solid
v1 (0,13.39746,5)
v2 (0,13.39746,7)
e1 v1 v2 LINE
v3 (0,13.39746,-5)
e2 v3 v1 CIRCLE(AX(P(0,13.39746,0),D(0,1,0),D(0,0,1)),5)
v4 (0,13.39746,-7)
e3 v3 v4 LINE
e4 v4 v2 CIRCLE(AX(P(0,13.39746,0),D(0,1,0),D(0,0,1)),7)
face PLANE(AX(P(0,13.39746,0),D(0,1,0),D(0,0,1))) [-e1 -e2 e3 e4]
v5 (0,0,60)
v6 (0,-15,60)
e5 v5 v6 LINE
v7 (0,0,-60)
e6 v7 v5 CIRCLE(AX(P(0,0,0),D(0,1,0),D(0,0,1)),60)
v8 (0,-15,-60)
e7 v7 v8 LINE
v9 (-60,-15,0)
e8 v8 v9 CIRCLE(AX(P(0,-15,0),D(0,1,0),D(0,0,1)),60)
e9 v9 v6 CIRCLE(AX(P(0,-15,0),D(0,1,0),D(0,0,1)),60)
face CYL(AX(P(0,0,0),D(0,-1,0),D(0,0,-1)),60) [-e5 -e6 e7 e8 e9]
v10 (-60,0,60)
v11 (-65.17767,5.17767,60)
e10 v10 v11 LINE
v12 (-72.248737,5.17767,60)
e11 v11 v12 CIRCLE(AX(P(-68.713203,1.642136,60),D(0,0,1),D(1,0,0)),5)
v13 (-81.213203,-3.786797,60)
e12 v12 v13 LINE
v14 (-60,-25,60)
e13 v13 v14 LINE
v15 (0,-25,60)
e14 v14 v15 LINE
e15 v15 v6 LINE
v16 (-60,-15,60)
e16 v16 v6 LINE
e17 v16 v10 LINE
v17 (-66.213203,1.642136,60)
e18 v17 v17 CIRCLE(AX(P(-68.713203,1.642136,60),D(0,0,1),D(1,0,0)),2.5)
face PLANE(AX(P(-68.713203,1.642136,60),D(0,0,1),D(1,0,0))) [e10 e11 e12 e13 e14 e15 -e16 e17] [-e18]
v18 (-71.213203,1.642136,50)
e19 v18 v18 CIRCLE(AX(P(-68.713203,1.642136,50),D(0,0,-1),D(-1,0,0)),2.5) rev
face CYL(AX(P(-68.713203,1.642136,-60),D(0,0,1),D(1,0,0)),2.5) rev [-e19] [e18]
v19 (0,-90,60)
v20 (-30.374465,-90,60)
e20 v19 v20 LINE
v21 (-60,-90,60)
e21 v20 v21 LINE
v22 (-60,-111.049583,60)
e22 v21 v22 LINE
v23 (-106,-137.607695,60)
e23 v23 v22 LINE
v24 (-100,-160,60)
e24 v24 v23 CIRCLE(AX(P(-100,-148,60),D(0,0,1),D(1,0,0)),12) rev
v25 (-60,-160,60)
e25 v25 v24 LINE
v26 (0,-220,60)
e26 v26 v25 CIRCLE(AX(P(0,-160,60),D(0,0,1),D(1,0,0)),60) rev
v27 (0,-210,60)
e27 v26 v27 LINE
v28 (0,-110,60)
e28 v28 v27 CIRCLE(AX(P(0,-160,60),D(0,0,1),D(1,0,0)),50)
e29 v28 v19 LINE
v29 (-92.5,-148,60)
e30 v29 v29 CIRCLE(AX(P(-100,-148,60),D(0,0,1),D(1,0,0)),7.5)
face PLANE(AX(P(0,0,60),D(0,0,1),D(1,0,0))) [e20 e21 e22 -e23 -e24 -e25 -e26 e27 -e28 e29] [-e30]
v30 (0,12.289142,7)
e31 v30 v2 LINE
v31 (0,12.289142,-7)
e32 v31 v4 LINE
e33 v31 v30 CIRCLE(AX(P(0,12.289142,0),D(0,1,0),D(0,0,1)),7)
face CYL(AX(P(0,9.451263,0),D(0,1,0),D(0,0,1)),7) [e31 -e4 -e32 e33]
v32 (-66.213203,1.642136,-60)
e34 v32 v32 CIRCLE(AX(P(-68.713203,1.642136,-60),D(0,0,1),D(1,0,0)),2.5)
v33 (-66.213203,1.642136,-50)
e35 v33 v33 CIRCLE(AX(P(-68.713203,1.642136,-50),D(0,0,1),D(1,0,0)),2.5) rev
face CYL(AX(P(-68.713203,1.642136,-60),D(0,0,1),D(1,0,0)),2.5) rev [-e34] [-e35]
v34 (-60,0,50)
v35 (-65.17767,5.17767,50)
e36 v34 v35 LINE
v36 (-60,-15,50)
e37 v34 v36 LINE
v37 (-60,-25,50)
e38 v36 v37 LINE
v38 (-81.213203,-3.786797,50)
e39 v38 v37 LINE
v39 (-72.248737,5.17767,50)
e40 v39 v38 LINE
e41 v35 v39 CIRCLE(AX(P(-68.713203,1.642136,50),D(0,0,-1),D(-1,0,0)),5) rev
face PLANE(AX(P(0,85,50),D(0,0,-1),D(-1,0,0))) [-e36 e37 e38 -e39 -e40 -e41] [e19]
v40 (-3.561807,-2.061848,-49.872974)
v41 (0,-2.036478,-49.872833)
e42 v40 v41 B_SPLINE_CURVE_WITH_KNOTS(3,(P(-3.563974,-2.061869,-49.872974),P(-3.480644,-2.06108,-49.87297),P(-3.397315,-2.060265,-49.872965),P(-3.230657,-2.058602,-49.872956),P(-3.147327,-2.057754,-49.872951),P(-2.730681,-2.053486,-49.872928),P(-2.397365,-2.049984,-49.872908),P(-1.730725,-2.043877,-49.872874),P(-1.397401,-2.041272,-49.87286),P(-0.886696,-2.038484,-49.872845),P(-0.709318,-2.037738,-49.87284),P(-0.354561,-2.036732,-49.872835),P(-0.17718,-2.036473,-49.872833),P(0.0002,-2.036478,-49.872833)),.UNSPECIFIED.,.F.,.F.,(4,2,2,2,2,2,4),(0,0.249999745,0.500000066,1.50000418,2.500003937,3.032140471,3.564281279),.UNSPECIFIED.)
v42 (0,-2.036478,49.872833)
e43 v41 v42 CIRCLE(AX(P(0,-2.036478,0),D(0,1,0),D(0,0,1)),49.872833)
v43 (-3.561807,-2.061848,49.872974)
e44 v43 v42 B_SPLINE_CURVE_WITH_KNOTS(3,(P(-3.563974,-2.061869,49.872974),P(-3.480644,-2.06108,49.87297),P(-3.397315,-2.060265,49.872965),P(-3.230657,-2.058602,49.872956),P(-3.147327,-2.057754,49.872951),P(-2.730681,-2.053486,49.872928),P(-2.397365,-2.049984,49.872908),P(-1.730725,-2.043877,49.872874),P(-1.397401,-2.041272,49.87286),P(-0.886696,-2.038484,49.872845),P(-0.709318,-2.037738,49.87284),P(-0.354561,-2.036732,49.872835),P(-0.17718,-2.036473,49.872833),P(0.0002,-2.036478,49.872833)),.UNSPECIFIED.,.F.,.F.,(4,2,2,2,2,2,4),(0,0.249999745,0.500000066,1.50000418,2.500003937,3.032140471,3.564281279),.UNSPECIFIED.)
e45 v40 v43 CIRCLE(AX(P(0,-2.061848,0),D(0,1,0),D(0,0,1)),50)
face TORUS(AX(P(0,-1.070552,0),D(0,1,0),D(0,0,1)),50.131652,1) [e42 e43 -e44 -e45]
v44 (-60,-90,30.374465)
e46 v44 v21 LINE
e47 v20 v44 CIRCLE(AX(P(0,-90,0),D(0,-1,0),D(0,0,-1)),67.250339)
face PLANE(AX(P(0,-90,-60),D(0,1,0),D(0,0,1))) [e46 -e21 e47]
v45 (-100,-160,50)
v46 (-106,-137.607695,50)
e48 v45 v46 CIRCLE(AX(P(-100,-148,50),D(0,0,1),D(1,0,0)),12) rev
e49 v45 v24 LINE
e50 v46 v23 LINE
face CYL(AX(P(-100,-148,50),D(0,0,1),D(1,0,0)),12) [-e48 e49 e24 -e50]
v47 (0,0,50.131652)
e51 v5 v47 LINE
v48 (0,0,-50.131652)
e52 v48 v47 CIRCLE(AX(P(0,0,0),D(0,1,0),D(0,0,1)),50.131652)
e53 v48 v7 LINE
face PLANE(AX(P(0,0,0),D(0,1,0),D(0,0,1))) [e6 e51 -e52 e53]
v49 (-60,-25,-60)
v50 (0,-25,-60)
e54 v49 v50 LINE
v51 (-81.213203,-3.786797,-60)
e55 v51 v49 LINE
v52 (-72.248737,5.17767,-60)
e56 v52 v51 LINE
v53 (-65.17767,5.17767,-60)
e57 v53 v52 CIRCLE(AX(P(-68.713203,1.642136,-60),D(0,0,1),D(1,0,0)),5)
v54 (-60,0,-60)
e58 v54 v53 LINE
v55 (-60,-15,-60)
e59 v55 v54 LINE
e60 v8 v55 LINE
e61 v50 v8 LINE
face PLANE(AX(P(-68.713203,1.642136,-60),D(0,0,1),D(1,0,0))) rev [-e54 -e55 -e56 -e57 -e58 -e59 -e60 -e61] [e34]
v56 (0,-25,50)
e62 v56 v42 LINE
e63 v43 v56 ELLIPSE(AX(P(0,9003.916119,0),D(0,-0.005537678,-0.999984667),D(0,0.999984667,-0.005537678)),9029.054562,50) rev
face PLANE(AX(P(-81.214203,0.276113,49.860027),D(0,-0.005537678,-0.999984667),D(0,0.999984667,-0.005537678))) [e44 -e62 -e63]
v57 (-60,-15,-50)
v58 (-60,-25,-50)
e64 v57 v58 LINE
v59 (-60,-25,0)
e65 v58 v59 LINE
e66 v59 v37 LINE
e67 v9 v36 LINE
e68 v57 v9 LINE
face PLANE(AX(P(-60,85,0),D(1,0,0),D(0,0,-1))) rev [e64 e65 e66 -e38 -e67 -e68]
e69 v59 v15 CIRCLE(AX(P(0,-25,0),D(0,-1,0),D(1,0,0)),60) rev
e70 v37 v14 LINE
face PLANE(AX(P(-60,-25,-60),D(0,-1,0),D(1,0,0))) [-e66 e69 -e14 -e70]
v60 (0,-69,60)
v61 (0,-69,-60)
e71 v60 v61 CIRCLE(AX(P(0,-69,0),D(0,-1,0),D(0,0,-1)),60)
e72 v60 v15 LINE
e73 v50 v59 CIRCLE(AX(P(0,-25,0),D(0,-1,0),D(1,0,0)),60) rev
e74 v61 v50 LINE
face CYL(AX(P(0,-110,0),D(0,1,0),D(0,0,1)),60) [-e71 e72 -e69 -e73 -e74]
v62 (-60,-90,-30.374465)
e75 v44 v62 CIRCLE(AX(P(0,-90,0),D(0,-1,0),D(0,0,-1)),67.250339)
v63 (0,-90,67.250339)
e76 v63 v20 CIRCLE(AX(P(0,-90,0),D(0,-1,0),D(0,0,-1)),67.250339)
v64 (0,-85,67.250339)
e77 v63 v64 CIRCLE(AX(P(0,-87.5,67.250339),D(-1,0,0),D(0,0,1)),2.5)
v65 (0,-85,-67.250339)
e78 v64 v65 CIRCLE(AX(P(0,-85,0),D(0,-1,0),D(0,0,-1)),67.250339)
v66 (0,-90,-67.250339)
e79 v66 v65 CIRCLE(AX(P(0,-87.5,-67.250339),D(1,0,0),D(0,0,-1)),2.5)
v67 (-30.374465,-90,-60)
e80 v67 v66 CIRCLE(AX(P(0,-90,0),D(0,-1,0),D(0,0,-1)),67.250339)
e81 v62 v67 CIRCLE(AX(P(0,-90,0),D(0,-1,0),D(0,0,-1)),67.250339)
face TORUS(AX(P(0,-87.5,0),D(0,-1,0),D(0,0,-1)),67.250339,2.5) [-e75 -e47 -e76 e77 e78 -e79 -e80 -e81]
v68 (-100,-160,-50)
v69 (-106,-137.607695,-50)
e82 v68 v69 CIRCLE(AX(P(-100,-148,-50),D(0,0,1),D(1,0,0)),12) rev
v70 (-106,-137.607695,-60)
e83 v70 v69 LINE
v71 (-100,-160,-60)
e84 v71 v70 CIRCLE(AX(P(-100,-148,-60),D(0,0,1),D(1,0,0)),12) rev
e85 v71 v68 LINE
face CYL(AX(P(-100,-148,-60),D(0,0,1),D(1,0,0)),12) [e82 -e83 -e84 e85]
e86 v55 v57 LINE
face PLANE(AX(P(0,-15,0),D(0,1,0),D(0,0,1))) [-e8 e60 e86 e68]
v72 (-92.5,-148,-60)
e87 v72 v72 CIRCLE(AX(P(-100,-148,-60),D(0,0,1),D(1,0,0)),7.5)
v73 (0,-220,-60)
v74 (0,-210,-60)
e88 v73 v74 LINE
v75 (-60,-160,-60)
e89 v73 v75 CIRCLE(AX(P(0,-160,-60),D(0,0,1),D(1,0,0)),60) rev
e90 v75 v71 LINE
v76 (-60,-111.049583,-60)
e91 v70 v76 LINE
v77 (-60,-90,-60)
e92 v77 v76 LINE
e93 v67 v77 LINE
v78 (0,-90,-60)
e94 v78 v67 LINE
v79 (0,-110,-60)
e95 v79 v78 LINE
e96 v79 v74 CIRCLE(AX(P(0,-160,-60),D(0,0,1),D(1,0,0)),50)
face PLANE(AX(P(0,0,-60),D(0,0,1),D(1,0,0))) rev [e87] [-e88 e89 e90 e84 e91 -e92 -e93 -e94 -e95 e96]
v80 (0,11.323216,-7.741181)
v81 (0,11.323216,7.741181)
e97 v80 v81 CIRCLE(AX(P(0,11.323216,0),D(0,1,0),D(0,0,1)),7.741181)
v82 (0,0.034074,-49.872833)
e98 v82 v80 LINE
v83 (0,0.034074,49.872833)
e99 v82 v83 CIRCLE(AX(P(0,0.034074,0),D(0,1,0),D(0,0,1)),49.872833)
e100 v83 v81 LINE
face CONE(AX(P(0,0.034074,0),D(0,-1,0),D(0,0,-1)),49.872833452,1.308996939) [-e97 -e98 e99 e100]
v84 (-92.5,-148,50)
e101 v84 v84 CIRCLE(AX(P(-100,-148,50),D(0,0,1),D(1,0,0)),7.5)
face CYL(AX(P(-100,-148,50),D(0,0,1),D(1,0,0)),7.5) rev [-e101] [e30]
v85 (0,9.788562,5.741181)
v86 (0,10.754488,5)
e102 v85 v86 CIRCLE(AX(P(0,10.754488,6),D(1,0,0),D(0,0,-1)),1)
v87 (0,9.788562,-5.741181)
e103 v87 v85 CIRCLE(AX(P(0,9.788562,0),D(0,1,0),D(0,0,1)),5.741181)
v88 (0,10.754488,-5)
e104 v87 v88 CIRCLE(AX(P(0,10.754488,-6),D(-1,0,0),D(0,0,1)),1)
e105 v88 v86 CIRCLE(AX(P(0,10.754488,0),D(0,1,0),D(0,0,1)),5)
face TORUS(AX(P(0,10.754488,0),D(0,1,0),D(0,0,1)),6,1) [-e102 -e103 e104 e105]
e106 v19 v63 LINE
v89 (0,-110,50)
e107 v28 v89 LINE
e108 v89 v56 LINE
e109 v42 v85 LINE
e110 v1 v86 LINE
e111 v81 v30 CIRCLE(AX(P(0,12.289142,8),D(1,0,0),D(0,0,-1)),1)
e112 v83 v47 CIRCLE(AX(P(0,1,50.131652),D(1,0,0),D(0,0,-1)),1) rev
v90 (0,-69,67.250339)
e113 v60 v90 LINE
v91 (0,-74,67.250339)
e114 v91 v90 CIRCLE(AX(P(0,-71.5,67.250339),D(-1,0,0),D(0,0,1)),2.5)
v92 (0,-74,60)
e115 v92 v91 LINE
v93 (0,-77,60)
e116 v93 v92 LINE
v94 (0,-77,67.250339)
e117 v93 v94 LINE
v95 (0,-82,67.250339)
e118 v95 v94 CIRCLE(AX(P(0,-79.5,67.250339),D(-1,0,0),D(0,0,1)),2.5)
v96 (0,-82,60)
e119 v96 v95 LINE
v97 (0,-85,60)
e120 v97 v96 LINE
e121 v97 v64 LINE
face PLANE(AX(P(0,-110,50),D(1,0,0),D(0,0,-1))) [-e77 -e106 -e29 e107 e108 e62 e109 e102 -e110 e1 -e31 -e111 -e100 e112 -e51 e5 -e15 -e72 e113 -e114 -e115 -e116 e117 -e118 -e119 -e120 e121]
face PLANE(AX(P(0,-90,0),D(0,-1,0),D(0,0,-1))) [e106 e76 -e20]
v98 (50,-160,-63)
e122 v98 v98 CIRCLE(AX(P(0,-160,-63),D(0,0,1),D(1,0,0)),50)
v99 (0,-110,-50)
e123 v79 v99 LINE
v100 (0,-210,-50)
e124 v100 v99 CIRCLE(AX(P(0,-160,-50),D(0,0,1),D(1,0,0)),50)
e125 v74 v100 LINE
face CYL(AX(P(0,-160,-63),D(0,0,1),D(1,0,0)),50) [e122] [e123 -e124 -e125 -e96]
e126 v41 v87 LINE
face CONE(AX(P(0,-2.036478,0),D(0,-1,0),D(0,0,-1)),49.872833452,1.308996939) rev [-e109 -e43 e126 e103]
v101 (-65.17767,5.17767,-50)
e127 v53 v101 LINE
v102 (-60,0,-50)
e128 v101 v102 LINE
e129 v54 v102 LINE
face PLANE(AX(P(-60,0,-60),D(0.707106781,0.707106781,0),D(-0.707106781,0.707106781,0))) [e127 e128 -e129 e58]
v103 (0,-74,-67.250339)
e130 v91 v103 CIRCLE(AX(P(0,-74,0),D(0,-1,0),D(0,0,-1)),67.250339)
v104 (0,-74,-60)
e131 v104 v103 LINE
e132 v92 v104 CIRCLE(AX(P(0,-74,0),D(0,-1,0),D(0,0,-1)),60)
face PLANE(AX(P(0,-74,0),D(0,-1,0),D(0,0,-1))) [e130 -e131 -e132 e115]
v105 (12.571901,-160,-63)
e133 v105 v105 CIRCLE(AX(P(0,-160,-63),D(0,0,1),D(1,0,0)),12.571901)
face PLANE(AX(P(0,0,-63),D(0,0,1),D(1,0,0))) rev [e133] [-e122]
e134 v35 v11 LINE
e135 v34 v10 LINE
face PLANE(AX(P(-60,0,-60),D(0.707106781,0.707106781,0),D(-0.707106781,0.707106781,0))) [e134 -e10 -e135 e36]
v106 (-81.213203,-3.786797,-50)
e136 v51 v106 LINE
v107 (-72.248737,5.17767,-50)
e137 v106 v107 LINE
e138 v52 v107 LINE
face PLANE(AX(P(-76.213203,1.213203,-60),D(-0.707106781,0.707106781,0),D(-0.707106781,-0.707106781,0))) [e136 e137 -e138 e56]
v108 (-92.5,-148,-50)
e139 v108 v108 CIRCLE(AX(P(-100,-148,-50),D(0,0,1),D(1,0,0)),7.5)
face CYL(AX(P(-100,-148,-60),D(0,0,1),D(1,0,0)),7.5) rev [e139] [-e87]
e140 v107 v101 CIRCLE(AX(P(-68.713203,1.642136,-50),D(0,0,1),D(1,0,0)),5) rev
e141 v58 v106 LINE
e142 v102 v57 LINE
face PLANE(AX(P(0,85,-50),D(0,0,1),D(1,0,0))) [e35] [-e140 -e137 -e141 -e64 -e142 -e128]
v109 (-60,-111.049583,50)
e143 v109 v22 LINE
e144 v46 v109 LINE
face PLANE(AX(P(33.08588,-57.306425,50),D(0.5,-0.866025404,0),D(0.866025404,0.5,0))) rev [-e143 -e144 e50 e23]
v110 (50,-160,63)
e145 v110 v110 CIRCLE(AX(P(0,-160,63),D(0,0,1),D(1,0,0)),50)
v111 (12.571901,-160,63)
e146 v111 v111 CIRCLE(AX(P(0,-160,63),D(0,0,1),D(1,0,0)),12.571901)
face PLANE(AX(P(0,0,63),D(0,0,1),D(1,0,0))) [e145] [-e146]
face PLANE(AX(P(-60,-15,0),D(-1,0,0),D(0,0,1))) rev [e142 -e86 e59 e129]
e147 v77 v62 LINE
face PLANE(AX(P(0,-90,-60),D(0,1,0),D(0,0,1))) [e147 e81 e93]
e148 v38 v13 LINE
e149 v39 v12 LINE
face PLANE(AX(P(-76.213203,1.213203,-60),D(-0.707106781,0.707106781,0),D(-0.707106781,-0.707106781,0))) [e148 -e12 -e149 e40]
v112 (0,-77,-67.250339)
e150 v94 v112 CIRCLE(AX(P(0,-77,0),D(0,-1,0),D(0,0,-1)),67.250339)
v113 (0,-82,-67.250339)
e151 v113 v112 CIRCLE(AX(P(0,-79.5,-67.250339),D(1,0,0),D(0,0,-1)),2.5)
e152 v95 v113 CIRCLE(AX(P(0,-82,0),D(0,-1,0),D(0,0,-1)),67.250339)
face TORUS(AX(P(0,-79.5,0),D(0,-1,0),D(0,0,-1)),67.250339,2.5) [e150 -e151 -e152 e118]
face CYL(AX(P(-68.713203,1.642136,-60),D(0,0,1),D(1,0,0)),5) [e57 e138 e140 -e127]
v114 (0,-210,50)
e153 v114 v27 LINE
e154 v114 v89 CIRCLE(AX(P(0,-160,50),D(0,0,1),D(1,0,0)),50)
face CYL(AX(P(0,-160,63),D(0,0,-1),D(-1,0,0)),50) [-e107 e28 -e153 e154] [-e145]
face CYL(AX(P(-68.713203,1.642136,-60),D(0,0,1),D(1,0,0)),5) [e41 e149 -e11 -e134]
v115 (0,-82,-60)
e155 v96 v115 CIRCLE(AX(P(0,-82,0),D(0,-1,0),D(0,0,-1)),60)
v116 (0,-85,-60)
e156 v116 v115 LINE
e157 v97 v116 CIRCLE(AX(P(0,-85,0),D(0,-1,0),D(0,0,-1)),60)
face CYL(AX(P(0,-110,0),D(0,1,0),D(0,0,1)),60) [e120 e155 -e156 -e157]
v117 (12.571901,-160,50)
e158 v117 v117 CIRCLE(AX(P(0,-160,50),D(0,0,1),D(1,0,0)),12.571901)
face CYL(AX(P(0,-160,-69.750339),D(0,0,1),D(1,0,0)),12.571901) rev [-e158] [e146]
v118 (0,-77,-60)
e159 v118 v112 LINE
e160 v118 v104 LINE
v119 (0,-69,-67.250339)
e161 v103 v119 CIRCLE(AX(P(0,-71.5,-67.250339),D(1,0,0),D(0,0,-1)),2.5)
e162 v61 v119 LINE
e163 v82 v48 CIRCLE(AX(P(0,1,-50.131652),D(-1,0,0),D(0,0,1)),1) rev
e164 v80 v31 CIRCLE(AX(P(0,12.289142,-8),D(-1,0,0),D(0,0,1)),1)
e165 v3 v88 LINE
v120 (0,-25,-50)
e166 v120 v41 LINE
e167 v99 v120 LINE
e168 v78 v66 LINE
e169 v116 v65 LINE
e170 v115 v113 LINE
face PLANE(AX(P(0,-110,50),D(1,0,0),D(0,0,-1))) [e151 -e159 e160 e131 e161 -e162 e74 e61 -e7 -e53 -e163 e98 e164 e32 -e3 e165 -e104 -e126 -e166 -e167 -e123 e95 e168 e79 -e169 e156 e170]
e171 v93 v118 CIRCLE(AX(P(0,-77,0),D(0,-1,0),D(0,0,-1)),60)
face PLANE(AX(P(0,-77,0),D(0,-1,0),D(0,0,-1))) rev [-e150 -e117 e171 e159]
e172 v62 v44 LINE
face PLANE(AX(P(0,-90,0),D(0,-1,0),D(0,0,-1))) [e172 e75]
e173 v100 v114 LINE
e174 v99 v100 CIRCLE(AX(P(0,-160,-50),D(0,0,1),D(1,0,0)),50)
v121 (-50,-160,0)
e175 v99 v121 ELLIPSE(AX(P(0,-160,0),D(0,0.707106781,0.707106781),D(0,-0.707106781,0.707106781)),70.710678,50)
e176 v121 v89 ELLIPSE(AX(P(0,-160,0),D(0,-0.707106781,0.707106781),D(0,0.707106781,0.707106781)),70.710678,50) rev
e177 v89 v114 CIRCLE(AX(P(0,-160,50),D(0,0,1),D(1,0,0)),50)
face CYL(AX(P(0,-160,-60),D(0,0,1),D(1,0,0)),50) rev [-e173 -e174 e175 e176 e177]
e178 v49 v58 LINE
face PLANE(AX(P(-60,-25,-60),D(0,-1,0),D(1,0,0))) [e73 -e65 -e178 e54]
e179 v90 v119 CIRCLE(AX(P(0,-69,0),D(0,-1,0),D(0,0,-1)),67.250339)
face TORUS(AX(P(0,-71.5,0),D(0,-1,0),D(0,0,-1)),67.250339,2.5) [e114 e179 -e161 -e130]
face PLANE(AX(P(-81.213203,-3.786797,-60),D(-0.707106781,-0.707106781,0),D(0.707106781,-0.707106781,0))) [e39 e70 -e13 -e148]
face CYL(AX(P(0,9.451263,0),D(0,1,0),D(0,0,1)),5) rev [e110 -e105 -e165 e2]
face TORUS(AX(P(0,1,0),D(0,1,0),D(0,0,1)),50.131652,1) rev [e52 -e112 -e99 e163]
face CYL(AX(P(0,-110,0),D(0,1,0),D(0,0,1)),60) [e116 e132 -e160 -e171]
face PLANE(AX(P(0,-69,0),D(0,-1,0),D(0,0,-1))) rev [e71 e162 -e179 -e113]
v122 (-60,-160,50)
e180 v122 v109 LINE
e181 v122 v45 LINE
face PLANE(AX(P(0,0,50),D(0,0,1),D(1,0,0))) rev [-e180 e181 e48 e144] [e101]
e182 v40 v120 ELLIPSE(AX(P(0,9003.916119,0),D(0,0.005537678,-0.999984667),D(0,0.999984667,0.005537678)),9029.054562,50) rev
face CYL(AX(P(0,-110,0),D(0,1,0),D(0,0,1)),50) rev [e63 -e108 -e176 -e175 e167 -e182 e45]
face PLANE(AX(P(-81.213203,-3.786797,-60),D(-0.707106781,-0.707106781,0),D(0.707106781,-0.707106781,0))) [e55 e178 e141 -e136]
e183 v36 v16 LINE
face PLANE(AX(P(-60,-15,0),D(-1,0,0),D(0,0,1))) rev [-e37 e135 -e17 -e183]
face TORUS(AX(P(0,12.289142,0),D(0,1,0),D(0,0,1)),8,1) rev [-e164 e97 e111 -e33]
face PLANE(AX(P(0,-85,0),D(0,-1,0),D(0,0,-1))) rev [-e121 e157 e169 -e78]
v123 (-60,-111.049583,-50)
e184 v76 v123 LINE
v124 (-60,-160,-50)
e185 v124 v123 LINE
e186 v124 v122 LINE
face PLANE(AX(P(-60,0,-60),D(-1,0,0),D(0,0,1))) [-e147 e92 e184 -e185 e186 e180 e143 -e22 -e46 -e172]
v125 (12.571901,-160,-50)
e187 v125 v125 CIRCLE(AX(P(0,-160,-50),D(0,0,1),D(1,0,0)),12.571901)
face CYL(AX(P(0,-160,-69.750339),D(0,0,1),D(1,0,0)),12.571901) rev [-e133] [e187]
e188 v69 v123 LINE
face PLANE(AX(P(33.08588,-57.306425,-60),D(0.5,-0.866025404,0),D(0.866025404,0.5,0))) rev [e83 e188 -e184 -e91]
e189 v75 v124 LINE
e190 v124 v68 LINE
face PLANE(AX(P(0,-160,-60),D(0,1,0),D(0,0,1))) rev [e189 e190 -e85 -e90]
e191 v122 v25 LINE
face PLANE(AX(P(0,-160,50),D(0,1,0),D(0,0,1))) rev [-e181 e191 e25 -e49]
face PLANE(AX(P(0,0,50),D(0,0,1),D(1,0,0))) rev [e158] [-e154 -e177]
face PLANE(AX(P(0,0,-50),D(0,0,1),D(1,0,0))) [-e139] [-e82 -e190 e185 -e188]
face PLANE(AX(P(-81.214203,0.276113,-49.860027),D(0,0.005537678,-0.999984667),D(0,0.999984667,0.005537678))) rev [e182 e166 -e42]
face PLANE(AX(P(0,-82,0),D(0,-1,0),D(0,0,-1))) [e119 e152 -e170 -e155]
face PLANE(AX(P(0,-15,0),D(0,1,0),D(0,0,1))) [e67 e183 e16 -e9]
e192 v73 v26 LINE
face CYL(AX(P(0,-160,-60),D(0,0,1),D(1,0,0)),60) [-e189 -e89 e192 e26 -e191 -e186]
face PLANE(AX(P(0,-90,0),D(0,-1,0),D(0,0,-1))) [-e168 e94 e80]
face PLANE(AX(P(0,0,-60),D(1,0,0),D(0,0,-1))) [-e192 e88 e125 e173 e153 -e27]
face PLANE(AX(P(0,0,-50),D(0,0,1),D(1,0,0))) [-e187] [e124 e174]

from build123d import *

# Parameters (mm, degrees)
BOSS_EXTRUDE1_DEPTH      = 110
REVOLVE4_ANGLE           = 180
SKETCH5_R                = 2.5
BOSS_EXTRUDE2_DEPTH      = 120
CUT_EXTRUDE2_REACH       = 151.317
CUT_EXTRUDE2_END_RADIUS  = 50
REVOLVE5_ANGLE           = 180
CUT_EXTRUDE4_DEPTH       = 15
CUT_EXTRUDE5_DEPTH       = 85
CUT_EXTRUDE5_DEPTH_BACK  = 75
SKETCH7_5_W              = 21.213203436
SKETCH7_5_H              = 100
REVOLVE6_ANGLE           = 180
BOSS_EXTRUDE3_DEPTH      = 3
BOSS_EXTRUDE3_DEPTH_BACK = 10
SKETCH9_R                = 50
BOSS_EXTRUDE4_START      = -110
SKETCH9_3_R              = 50
BOSS_EXTRUDE4_DEPTH      = 13
BOSS_EXTRUDE5_DEPTH      = 120
CUT_EXTRUDE6_START       = -110
CUT_EXTRUDE6_DEPTH       = 20
CUT_EXTRUDE7_DEPTH       = 50
SKETCH9_5_R              = 7.5
BOSS_EXTRUDE6_DEPTH      = 10
BOSS_EXTRUDE7_START      = -110
SKETCH9_6_R              = 7.5
BOSS_EXTRUDE7_DEPTH      = 10
SKETCH12_R               = 12.571901436
CUT_EXTRUDE8_DEPTH       = 281.297435946
BOSS_EXTRUDE9_START      = 15
BOSS_EXTRUDE9_DEPTH      = 15


# Read off the part's stored shape, not the designer's step: Cut-Extrude6
with BuildPart() as part:
    # Sketch1 → Boss-Extrude1 (new body)
    with BuildSketch(Plane(origin=(0, 0, 0), x_dir=(1, 0, 0), z_dir=(0, 1, 0))):
        with BuildLine():
            Line((0, 60), (0, 50))
            ThreePointArc((0, 50), (-50, 0), (0, -50))
            Line((0, -50), (0, -60))
            ThreePointArc((0, -60), (-60, 0), (0, 60))
        make_face()
    extrude(amount=-BOSS_EXTRUDE1_DEPTH)

    # Sketch2 → Revolve4 (revolve)
    with BuildSketch(Plane(origin=(0, 0, 0), x_dir=(0, 0, -1), z_dir=(1, 0, 0))):
        with BuildLine():
            ThreePointArc((-7.741180955, 11.323216436), (-7.20664666, 11.680380834), (-7, 12.289142263))
            Line((-7, 12.289142263), (-7, 13.397459622))
            Line((-7, 13.397459622), (-5, 13.397459622))
            Line((-5, 13.397459622), (-5, 12.057713659))
            Line((-5, 12.057713659), (-5, 10.754488287))
            ThreePointArc((-5, 10.754488287), (-5.20664666, 10.145726858), (-5.741180955, 9.78856246))
            Line((-5.741180955, 9.78856246), (-49.872833452, -2.036478187))
            ThreePointArc((-49.872833452, -2.036478187), (-50.001126305, -2.061997222), (-50.131652498, -2.070552361))
            Line((-50.131652498, -2.070552361), (-60, -2.070552361))
            Line((-60, -2.070552361), (-60, 0))
            Line((-60, 0), (-50.131652498, 0))
            ThreePointArc((-50.131652498, 0), (-50.001126305, 0.008555139), (-49.872833452, 0.034074174))
            Line((-49.872833452, 0.034074174), (-7.741180955, 11.323216436))
        make_face()
    revolve(axis=Axis((0, 9.451262914, 0), (0, -1, 0)), revolution_arc=REVOLVE4_ANGLE)

    # Sketch5 → Boss-Extrude2 (add)
    with BuildSketch(Plane.XY.offset(60)):
        with BuildLine():
            Line((-60, -25), (0, -25))
            Line((0, -25), (0, -15))
            Line((0, -15), (0, 0))
            Line((0, 0), (-60, 0))
            Line((-60, 0), (-65.17766953, 5.17766953))
            ThreePointArc((-65.17766953, 5.17766953), (-68.713203436, 6.642135624), (-72.248737342, 5.17766953))
            Line((-72.248737342, 5.17766953), (-76.213203436, 1.213203436))
            Line((-76.213203436, 1.213203436), (-81.213203436, -3.786796564))
            Line((-81.213203436, -3.786796564), (-60, -25))
        make_face()
        with Locations((-68.713203436, 1.642135624)):
            Circle(SKETCH5_R, mode=Mode.SUBTRACT)
    extrude(amount=-BOSS_EXTRUDE2_DEPTH)

    # Cut-Extrude2: up to this cylinder (the profile starts inside it)
    cut_extrude2_end = Plane(origin=(0, -12.579447, 0), z_dir=(0, 1, 0)) * Cylinder(CUT_EXTRUDE2_END_RADIUS, 403.634, mode=Mode.PRIVATE)
    # Sketch6 → Cut-Extrude2 (cut, up to the surface)
    with BuildSketch(Plane(origin=(0, 0, 0), x_dir=(0, 0, -1), z_dir=(1, 0, 0)), mode=Mode.PRIVATE) as cut_extrude2_sk1:
        Polygon((-49.872833452, -2.036478187), (-50, -25), (50, -25), (49.872833452, -2.036478187), (42.27259339, 0), (-42.27259339, 0), align=None)
    cut_extrude2_tool1 = extrude(cut_extrude2_sk1.sketch, amount=-CUT_EXTRUDE2_REACH, mode=Mode.PRIVATE) & cut_extrude2_end
    add(cut_extrude2_tool1.solids().sort_by_distance((0, -12.579447, 0))[0], mode=Mode.SUBTRACT)

    # Sketch2<8> → Revolve5 (revolve)
    with BuildSketch(Plane(origin=(0, 0, 0), x_dir=(0, 0, -1), z_dir=(1, 0, 0))):
        with BuildLine():
            Line((-49.872833452, 0.034074174), (-7.741180955, 11.323216436))
            ThreePointArc((-7.741180955, 11.323216436), (-7.20664666, 11.680380834), (-7, 12.289142263))
            Line((-7, 12.289142263), (-7, 13.397459622))
            Line((-7, 13.397459622), (-5, 13.397459622))
            Line((-5, 13.397459622), (-5, 12.057713659))
            Line((-5, 12.057713659), (-5, 10.754488287))
            ThreePointArc((-5, 10.754488287), (-5.20664666, 10.145726858), (-5.741180955, 9.78856246))
            Line((-5.741180955, 9.78856246), (-49.872833452, -2.036478187))
            ThreePointArc((-49.872833452, -2.036478187), (-50.001126305, -2.061997222), (-50.131652498, -2.070552361))
            Line((-50.131652498, -2.070552361), (-60, -2.070552361))
            Line((-60, -2.070552361), (-60, 0))
            Line((-60, 0), (-50.131652498, 0))
            ThreePointArc((-50.131652498, 0), (-50.001126305, 0.008555139), (-49.872833452, 0.034074174))
        make_face()
    revolve(axis=Axis((0, 9.451262914, 0), (0, -1, 0)), revolution_arc=REVOLVE5_ANGLE)

    # Sketch7 → Cut-Extrude4 (cut)
    with BuildSketch(Plane(origin=(0, 0, 0), x_dir=(1, 0, 0), z_dir=(0, 1, 0))):
        with BuildLine():
            ThreePointArc((0, -50.131652498), (-50.131652498, 0), (0, 50.131652498))
            Line((0, 50.131652498), (0, 60))
            Line((0, 60), (-60, 60))
            Line((-60, 60), (-60, 50))
            Line((-60, 50), (-60, -50))
            Line((-60, -50), (-60, -60))
            Line((-60, -60), (0, -60))
            Line((0, -60), (0, -50.131652498))
        make_face()
    extrude(amount=-CUT_EXTRUDE4_DEPTH, mode=Mode.SUBTRACT)

    # Sketch7<5> → Cut-Extrude5 (cut, two sides: drawn at the far end of the back side and taken through both)
    with BuildSketch(Plane(origin=(0, 0, 0), x_dir=(1, 0, 0), z_dir=(0, 1, 0)).offset(-CUT_EXTRUDE5_DEPTH_BACK)):
        with Locations((-70.606601718, 0)):
            Rectangle(SKETCH7_5_W, SKETCH7_5_H)
    extrude(amount=CUT_EXTRUDE5_DEPTH + CUT_EXTRUDE5_DEPTH_BACK, mode=Mode.SUBTRACT)

    # Sketch8 → Revolve6 (revolve)
    with BuildSketch(Plane(origin=(0, 0, 0), x_dir=(0, 0, -1), z_dir=(1, 0, 0))):
        with BuildLine():
            Line((60, -77), (60, -82))
            Line((60, -82), (67.250339251, -82))
            ThreePointArc((67.250339251, -82), (69.750339251, -79.5), (67.250339251, -77))
            Line((67.250339251, -77), (60, -77))
        make_face()
        with BuildLine():
            Line((67.250339251, -85), (60, -85))
            Line((60, -85), (60, -90))
            Line((60, -90), (67.250339251, -90))
            ThreePointArc((67.250339251, -90), (69.750339251, -87.5), (67.250339251, -85))
        make_face()
        with BuildLine():
            Line((60, -69), (60, -74))
            Line((60, -74), (67.250339251, -74))
            ThreePointArc((67.250339251, -74), (69.750339251, -71.5), (67.250339251, -69))
            Line((67.250339251, -69), (60, -69))
        make_face()
    revolve(axis=Axis((0, -110, 0), (0, 1, 0)), revolution_arc=REVOLVE6_ANGLE)



with BuildPart() as body_2:
    # Sketch9 → Boss-Extrude3 (new, two sides: drawn at the far end of the back side and taken through both)
    with BuildSketch(Plane.XY.offset(60).offset(-BOSS_EXTRUDE3_DEPTH_BACK)):
        with Locations((0, -160)):
            Circle(SKETCH9_R)
    extrude(amount=BOSS_EXTRUDE3_DEPTH + BOSS_EXTRUDE3_DEPTH_BACK)


with BuildPart() as body_3:
    # Sketch9<3> → Boss-Extrude4 (new body)
    with BuildSketch(Plane.XY.offset(60).offset(BOSS_EXTRUDE4_START)):
        with Locations((0, -160)):
            Circle(SKETCH9_3_R)
    extrude(amount=-BOSS_EXTRUDE4_DEPTH)


with BuildPart() as part_1:
    add(part.part)

    add(body_2.part)  # Boss-Extrude5 merges body 2

    add(body_3.part)  # Boss-Extrude5 merges body 3
    # Sketch9<4> → Boss-Extrude5 (add)
    with BuildSketch(Plane.XY.offset(60)):
        with BuildLine():
            Line((-60, -111.049582772), (-60, -160))
            ThreePointArc((-60, -160), (-42.426406871, -202.426406871), (0, -220))
            Line((0, -220), (0, -210))
            ThreePointArc((0, -210), (-50, -160), (0, -110))
            Line((0, -110), (0, -90))
            Line((0, -90), (-60, -90))
            Line((-60, -90), (-60, -111.049582772))
        make_face()
    extrude(amount=-BOSS_EXTRUDE5_DEPTH)

    # Cut-Extrude6 outline → Cut-Extrude6 (cut)
    with BuildSketch(Plane(origin=(0, 0, 0), x_dir=(1, 0, 0), z_dir=(0, 1, 0)).offset(CUT_EXTRUDE6_START)):
        with BuildLine():
            Line((0, -50), (0, 50))
            ThreePointArc((0, 50), (-50, 0), (0, -50))
        make_face()
    extrude(amount=CUT_EXTRUDE6_DEPTH, mode=Mode.SUBTRACT)

    # Sketch11 → Cut-Extrude7 (cut)
    with BuildSketch(Plane(origin=(0, -110, 0), x_dir=(1, 0, 0), z_dir=(0, 1, 0))):
        with BuildLine():
            Line((0, -50), (0, 50))
            ThreePointArc((0, 50), (-50, 0), (0, -50))
        make_face()
    extrude(amount=-CUT_EXTRUDE7_DEPTH, mode=Mode.SUBTRACT)

    # Sketch9<5> → Boss-Extrude6 (add)
    with BuildSketch(Plane.XY.offset(60)):
        with BuildLine():
            ThreePointArc((-100, -160), (-111.591109915, -151.105828541), (-106, -137.607695155))
            Line((-106, -137.607695155), (-60, -111.049582772))
            Line((-60, -111.049582772), (-60, -160))
            Line((-60, -160), (-100, -160))
        make_face()
        with Locations((-100, -148)):
            Circle(SKETCH9_5_R, mode=Mode.SUBTRACT)
    extrude(amount=-BOSS_EXTRUDE6_DEPTH)

    # Sketch9<6> → Boss-Extrude7 (add)
    with BuildSketch(Plane.XY.offset(60).offset(BOSS_EXTRUDE7_START)):
        with BuildLine():
            ThreePointArc((-100, -160), (-111.591109915, -151.105828541), (-106, -137.607695155))
            Line((-106, -137.607695155), (-60, -111.049582772))
            Line((-60, -111.049582772), (-60, -160))
            Line((-60, -160), (-100, -160))
        make_face()
        with Locations((-100, -148)):
            Circle(SKETCH9_6_R, mode=Mode.SUBTRACT)
    extrude(amount=-BOSS_EXTRUDE7_DEPTH)

    # Sketch12 → Cut-Extrude8 (cut, through all)
    with BuildSketch(Plane.XY.offset(63)):
        with Locations((0, -160)):
            Circle(SKETCH12_R)
    extrude(amount=-CUT_EXTRUDE8_DEPTH, mode=Mode.SUBTRACT)

    # Sketch13 → Boss-Extrude9 (add)
    with BuildSketch(Plane(origin=(0, -15, 0), x_dir=(1, 0, 0), z_dir=(0, 1, 0)).offset(BOSS_EXTRUDE9_START)):
        with BuildLine():
            ThreePointArc((0, 60), (-60, 0), (0, -60))
            Line((0, -60), (0, -50.131652498))
            ThreePointArc((0, -50.131652498), (-50.131652498, 0), (0, 50.131652498))
            Line((0, 50.131652498), (0, 60))
        make_face()
    extrude(amount=-BOSS_EXTRUDE9_DEPTH)


solid = part_1.part
